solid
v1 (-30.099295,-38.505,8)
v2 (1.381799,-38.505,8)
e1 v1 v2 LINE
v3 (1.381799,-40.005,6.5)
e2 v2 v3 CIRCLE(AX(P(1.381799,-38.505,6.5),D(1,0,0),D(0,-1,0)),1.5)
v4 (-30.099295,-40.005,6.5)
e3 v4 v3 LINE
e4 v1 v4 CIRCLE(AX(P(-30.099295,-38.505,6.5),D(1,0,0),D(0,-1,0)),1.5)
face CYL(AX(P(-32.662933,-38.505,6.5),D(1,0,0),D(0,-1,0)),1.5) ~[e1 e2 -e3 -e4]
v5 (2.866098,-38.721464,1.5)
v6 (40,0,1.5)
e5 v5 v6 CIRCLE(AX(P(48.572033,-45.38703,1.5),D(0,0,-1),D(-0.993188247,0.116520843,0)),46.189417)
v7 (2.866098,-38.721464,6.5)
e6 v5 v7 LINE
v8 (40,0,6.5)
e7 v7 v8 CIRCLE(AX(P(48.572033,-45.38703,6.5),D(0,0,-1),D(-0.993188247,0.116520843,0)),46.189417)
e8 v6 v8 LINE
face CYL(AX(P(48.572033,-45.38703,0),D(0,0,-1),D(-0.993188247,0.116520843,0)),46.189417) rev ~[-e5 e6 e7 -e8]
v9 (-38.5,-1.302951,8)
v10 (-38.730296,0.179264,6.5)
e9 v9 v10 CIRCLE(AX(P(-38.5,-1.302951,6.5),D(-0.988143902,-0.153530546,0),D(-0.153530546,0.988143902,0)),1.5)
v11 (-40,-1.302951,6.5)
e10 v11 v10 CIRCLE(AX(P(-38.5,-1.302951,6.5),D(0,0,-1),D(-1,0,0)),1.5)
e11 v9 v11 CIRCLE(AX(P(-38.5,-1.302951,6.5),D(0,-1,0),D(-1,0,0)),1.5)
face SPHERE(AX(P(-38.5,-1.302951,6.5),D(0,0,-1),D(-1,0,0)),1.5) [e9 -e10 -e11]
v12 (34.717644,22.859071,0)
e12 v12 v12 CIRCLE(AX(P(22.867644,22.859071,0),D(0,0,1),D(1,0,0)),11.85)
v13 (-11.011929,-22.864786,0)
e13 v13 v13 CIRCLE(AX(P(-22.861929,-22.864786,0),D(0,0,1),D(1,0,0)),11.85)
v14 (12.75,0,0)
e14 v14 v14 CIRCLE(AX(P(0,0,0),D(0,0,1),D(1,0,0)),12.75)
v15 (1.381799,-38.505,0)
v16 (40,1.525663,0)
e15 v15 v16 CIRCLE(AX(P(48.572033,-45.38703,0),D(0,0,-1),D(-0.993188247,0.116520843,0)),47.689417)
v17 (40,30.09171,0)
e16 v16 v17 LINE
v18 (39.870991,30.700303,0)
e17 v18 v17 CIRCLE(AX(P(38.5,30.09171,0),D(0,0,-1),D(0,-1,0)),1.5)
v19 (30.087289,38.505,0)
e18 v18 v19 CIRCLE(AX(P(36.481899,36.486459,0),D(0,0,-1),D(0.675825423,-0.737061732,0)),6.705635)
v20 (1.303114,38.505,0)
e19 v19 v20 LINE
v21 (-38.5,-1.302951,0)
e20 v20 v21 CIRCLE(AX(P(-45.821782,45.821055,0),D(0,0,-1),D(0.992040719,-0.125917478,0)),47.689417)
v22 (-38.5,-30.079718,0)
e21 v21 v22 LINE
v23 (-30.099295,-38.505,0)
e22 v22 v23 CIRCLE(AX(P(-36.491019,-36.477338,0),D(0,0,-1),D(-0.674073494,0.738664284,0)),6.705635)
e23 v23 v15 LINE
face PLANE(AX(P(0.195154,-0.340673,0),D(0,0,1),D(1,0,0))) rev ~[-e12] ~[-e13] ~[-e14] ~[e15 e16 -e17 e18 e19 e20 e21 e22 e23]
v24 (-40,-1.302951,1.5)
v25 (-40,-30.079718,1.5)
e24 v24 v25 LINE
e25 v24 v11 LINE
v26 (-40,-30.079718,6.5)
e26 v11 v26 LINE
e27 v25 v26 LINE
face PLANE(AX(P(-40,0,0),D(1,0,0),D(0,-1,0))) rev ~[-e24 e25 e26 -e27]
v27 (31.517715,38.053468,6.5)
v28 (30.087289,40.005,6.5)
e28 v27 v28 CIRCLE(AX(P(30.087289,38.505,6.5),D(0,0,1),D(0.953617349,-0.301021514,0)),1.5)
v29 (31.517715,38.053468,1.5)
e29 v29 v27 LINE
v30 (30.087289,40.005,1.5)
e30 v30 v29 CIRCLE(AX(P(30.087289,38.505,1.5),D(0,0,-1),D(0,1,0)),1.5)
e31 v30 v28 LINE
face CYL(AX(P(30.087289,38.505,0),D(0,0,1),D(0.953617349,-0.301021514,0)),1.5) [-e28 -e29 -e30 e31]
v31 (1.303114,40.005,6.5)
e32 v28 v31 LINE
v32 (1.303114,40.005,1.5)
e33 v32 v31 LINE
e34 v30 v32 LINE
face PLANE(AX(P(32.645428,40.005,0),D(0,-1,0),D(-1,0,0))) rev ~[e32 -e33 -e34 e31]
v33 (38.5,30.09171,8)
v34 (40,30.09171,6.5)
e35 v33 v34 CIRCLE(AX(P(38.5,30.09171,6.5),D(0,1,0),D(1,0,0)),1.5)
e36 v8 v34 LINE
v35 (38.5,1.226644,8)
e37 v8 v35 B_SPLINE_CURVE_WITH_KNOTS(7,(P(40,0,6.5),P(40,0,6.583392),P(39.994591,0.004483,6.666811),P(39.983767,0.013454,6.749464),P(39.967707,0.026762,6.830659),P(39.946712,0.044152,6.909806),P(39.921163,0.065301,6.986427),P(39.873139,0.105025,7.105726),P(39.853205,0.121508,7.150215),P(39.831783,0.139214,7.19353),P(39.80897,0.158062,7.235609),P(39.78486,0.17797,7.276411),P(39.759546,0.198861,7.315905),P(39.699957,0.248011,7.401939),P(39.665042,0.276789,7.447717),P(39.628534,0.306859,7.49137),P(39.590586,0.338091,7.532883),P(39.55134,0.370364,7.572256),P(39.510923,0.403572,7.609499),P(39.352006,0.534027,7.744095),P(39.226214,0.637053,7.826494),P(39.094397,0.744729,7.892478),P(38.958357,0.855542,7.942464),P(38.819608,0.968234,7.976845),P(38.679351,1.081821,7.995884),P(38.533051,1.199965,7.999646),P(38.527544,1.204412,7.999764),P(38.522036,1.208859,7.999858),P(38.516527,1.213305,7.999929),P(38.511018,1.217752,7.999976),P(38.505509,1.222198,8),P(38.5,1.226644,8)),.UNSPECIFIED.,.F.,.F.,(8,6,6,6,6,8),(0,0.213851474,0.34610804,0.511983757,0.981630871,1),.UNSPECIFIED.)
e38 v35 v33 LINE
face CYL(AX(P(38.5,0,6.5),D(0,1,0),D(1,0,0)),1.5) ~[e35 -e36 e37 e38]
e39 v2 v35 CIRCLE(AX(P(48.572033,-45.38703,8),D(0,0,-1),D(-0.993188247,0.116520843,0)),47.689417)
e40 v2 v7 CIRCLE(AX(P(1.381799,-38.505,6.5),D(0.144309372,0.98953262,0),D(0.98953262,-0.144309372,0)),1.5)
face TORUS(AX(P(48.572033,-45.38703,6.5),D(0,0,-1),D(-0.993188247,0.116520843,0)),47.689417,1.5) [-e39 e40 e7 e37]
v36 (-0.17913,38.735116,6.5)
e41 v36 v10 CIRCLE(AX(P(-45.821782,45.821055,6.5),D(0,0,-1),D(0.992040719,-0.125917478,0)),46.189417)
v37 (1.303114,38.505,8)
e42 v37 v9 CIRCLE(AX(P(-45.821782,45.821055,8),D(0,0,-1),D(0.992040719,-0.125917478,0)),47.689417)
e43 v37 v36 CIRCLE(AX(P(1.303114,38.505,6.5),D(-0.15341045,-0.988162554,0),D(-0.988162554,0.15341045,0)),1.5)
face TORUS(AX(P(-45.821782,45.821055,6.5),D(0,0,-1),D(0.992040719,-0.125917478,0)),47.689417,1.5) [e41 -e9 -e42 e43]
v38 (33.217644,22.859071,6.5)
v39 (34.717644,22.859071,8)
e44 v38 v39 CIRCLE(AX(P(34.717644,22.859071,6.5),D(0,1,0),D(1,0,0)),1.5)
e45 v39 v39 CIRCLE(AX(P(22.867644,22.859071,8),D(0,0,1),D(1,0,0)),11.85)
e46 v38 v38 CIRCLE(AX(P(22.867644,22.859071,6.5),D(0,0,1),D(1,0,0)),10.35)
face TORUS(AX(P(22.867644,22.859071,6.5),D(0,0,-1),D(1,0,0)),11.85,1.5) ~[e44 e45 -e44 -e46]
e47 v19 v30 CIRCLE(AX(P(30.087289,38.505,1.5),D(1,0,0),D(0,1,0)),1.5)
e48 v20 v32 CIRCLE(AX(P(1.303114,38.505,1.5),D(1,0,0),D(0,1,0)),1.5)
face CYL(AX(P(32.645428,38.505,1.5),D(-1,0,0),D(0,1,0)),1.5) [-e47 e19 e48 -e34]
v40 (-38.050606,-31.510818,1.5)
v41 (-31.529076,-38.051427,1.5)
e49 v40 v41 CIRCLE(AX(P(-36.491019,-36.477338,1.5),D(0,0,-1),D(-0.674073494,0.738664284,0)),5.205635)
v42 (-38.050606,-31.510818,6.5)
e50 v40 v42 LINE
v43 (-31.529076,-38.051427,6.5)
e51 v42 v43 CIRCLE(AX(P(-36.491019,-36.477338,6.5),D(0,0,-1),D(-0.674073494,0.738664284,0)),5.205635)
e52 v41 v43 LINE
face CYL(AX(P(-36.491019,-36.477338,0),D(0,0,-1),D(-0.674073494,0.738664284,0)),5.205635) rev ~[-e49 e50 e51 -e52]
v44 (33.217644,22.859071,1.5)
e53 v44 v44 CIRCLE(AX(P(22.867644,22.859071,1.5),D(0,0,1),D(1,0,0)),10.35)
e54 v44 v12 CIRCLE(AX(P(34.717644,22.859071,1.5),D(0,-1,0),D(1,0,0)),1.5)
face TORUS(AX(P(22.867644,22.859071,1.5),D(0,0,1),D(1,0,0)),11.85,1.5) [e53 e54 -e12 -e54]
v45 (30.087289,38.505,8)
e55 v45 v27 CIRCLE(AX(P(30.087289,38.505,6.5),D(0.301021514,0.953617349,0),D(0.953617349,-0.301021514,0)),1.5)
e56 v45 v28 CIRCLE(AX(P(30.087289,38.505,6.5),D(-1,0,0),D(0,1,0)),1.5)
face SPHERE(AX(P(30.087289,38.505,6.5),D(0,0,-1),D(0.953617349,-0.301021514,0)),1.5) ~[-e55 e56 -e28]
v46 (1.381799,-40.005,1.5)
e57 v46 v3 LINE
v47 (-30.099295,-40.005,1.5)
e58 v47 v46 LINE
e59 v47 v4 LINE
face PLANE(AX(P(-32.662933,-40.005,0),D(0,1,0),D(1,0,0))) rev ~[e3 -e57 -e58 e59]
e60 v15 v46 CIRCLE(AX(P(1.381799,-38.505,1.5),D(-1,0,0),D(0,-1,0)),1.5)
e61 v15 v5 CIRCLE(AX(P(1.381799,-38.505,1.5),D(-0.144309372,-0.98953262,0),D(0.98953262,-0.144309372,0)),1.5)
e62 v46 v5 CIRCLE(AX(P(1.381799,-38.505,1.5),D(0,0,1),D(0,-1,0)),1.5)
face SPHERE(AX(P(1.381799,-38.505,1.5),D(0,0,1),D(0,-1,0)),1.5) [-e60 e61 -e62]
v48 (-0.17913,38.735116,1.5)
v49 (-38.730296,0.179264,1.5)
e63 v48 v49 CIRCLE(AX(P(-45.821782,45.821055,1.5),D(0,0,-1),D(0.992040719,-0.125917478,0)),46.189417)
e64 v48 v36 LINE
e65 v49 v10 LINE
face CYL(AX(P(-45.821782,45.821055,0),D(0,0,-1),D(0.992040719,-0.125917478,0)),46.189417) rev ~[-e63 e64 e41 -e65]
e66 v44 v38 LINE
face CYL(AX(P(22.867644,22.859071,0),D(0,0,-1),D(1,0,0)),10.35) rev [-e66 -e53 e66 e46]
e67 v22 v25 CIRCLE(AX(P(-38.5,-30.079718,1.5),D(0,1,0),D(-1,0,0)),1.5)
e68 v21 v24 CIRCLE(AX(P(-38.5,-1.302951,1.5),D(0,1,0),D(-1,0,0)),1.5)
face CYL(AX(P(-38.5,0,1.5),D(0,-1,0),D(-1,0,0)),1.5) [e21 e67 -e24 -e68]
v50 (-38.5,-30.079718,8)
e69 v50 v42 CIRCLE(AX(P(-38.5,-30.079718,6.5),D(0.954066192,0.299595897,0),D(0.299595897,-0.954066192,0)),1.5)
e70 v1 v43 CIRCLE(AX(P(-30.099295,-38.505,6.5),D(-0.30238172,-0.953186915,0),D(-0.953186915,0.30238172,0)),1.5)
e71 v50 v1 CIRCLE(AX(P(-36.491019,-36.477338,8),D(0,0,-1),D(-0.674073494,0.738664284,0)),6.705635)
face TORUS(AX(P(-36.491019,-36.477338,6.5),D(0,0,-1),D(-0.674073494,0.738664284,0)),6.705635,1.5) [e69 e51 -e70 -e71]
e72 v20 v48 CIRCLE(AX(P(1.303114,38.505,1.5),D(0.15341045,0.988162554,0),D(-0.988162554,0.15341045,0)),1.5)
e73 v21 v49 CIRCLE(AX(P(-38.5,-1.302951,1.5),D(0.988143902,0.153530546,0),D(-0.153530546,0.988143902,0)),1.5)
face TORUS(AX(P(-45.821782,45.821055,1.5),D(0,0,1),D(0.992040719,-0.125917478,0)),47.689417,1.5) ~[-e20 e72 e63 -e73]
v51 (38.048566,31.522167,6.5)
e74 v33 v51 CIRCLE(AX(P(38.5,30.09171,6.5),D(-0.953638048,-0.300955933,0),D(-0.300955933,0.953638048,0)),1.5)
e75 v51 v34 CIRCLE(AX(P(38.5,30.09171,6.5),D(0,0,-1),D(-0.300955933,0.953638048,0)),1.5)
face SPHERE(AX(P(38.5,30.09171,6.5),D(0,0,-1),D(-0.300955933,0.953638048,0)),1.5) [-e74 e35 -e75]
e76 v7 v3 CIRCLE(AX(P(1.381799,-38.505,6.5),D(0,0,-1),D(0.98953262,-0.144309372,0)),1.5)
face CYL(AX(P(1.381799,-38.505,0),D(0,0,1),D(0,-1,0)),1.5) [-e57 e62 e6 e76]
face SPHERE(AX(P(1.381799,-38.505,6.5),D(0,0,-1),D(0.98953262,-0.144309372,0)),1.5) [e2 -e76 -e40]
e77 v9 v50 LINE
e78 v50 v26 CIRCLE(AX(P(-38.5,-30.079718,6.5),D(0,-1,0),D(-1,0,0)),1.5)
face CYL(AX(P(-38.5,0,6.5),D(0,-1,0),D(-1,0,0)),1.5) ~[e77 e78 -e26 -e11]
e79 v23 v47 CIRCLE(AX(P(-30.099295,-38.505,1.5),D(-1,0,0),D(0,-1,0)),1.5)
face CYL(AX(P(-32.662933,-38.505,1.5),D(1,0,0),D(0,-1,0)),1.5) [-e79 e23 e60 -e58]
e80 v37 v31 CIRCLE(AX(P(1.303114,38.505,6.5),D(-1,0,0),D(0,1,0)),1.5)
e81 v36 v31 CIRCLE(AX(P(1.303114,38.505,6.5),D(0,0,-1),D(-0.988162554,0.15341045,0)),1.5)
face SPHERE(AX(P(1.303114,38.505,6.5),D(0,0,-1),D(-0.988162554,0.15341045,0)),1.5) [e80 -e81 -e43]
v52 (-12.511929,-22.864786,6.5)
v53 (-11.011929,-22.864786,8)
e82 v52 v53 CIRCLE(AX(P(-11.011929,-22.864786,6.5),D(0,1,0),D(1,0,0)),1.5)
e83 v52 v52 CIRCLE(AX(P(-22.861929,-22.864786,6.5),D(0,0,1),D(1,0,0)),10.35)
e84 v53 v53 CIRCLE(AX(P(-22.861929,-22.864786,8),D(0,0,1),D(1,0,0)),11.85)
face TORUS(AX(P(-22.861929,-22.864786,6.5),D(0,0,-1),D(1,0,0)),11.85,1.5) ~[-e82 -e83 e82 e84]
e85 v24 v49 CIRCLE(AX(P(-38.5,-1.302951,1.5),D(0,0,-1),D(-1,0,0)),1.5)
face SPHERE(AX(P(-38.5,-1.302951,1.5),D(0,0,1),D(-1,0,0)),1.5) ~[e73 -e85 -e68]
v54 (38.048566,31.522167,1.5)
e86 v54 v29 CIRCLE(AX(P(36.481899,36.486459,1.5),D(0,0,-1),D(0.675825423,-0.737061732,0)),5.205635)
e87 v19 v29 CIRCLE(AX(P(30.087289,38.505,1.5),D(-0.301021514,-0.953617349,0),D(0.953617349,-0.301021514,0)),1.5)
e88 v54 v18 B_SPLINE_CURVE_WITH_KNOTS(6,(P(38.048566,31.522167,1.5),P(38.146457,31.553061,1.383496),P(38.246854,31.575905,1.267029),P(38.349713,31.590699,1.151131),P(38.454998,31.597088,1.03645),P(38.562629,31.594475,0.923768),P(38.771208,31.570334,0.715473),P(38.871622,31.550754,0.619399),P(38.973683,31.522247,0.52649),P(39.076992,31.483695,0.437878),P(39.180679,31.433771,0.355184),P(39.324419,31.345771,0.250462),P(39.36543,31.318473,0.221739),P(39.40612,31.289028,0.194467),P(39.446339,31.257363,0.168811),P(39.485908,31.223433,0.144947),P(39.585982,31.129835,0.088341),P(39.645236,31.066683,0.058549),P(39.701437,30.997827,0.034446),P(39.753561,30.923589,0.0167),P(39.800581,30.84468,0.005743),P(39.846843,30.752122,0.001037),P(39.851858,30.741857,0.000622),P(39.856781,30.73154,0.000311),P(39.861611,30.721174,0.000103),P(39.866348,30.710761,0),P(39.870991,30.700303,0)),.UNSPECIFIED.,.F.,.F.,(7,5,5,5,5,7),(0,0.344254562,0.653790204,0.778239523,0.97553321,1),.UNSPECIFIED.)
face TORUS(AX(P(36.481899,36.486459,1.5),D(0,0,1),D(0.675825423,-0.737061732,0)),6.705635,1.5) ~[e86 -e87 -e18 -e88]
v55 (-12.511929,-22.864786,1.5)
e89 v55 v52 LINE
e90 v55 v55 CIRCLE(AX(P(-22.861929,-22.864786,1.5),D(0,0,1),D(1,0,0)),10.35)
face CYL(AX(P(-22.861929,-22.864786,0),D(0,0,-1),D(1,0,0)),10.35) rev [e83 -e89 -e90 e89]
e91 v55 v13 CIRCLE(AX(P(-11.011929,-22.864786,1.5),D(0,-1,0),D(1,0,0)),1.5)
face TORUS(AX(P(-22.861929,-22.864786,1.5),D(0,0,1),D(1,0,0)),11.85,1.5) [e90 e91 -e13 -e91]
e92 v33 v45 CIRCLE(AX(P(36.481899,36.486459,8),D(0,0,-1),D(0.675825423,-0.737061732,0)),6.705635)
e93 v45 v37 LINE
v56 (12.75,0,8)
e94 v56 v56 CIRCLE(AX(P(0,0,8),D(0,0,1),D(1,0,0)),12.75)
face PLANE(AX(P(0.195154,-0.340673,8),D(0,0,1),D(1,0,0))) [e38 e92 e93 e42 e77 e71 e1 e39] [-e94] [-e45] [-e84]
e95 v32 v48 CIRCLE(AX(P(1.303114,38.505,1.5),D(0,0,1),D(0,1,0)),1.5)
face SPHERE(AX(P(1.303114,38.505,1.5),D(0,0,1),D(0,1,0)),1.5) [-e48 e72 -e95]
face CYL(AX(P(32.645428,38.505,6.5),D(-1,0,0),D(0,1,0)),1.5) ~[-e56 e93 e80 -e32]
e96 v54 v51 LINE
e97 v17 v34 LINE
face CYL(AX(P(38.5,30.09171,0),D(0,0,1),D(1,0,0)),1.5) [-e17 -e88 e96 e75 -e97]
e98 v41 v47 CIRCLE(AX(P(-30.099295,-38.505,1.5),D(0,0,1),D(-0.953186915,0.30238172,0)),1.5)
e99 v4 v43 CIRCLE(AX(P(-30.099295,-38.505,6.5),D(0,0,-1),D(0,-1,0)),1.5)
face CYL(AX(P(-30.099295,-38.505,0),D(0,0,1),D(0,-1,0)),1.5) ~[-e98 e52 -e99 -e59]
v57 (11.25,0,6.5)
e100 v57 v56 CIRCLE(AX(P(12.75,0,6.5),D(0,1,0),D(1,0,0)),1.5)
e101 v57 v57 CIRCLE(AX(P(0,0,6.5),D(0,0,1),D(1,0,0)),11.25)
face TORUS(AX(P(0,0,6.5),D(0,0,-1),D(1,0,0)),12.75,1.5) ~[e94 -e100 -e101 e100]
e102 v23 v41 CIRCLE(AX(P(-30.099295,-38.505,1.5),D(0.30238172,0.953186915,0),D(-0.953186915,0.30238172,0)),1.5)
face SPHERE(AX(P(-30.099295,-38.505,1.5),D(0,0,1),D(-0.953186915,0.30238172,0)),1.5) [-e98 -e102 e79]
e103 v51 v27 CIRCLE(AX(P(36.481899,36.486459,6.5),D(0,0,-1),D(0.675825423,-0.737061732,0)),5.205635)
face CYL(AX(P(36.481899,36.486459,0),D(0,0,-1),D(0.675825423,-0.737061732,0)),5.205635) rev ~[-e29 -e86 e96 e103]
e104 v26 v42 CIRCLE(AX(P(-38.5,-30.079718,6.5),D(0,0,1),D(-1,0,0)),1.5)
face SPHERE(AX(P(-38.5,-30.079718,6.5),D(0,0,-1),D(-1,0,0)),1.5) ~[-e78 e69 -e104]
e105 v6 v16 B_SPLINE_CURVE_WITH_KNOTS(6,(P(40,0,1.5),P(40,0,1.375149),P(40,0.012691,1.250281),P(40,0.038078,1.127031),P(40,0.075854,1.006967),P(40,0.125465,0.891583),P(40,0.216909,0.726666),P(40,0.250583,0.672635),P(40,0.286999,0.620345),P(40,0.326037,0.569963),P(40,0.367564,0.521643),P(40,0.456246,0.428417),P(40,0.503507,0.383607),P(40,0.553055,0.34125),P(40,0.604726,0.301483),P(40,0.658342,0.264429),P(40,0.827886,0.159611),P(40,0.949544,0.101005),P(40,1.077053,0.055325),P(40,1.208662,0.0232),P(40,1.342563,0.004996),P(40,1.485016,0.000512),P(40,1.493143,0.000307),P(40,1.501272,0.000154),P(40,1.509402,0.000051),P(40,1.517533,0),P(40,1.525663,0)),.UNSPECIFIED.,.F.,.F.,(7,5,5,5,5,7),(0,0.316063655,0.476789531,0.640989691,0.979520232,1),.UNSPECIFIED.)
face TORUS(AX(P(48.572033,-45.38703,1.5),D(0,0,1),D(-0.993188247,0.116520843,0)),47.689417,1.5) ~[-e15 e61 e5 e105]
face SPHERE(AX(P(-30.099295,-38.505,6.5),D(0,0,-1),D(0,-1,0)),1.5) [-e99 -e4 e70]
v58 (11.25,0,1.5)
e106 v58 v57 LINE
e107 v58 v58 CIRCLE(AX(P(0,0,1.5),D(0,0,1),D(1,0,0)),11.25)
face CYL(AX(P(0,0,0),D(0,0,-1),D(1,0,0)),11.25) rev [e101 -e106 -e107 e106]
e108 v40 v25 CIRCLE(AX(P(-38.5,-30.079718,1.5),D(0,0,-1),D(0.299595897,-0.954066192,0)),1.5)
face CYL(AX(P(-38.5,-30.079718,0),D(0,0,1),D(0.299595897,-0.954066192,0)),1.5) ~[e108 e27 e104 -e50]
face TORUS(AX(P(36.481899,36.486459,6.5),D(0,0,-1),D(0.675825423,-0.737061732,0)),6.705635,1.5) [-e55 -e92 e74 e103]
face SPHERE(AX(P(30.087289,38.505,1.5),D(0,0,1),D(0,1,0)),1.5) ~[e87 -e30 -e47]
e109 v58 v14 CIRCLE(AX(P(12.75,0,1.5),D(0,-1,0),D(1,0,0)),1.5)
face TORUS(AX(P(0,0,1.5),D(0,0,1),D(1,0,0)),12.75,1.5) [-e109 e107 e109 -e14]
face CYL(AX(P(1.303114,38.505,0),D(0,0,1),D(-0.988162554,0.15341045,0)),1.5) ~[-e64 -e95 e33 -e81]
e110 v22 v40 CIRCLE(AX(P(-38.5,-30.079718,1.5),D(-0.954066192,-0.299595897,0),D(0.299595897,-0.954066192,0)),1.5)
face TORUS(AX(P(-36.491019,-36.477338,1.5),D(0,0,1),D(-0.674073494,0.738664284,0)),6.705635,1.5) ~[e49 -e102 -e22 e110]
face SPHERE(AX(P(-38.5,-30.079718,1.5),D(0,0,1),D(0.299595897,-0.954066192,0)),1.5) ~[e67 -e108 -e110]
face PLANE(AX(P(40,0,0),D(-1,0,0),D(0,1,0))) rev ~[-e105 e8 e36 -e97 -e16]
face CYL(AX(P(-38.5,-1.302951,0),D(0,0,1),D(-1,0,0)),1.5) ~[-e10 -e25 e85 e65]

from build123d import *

# Parameters (mm, degrees)
F0_R     = 10.35
F0_R_2   = 11.25
F1_DEPTH = 8
F2_R     = 1.5


with BuildPart() as f1:
    # F0 (on Top) → F1 (new body)
    with BuildSketch(Plane.XY):
        with BuildLine():
            Line((-32.6629329423, -40.005), (2.6972468477, -40.005))
            ThreePointArc((2.6972468477, -40.005), (14.7901733739, -13.8870583483), (40, 0))
            Line((40, 0), (40, 32.6495848183))
            ThreePointArc((40, 32.6495848183), (32.8007481843, 32.8057303341), (32.6454278537, 40.005))
            Line((32.6454278537, 40.005), (0, 40.005))
            ThreePointArc((0, 40.005), (-13.1588912929, 13.1622463246), (-40, 0))
            Line((-40, 0), (-40, -32.6321214732))
            ThreePointArc((-40, -32.6321214732), (-32.8011286985, -32.805370484), (-32.6629329423, -40.005))
        make_face()
        with Locations((-22.8619287392, -22.8647864803)):
            Circle(F0_R, mode=Mode.SUBTRACT)
        Circle(F0_R_2, mode=Mode.SUBTRACT)
        with Locations((22.8676438642, 22.8590706409)):
            Circle(F0_R, mode=Mode.SUBTRACT)
    extrude(amount=F1_DEPTH)

    # F2
    f2_edges = [f1.edges().sort_by_distance(p)[0] for p in [
        (12.517644, 22.859071, 8),
        (-11.25, 0, 8),
        (-33.211929, -22.864786, 8),
        (12.517644, 22.859071, 0),
        (-11.25, 0, 0),
        (-33.211929, -22.864786, 0),
        (32.800748, 32.80573, 8),
        (40, 16.324792, 8),
        (14.790173, -13.887058, 8),
        (-14.982843, -40.005, 8),
        (-40, -16.316061, 8),
        (-32.801129, -32.80537, 8),
        (-13.158891, 13.162246, 8),
        (16.322714, 40.005, 8),
        (32.645428, 40.005, 4),
        (40, 32.649585, 4),
        (16.322714, 40.005, 0),
        (-13.158891, 13.162246, 0),
        (-40, 0, 4),
        (0, 40.005, 4),
        (-40, -16.316061, 0),
        (-40, -32.632121, 4),
        (-32.662933, -40.005, 4),
        (-32.801129, -32.80537, 0),
        (-14.982843, -40.005, 0),
        (14.790173, -13.887058, 0),
        (2.697247, -40.005, 4),
        (32.800748, 32.80573, 0),
    ]]
    fillet(f2_edges, radius=F2_R)


solid = f1.part
